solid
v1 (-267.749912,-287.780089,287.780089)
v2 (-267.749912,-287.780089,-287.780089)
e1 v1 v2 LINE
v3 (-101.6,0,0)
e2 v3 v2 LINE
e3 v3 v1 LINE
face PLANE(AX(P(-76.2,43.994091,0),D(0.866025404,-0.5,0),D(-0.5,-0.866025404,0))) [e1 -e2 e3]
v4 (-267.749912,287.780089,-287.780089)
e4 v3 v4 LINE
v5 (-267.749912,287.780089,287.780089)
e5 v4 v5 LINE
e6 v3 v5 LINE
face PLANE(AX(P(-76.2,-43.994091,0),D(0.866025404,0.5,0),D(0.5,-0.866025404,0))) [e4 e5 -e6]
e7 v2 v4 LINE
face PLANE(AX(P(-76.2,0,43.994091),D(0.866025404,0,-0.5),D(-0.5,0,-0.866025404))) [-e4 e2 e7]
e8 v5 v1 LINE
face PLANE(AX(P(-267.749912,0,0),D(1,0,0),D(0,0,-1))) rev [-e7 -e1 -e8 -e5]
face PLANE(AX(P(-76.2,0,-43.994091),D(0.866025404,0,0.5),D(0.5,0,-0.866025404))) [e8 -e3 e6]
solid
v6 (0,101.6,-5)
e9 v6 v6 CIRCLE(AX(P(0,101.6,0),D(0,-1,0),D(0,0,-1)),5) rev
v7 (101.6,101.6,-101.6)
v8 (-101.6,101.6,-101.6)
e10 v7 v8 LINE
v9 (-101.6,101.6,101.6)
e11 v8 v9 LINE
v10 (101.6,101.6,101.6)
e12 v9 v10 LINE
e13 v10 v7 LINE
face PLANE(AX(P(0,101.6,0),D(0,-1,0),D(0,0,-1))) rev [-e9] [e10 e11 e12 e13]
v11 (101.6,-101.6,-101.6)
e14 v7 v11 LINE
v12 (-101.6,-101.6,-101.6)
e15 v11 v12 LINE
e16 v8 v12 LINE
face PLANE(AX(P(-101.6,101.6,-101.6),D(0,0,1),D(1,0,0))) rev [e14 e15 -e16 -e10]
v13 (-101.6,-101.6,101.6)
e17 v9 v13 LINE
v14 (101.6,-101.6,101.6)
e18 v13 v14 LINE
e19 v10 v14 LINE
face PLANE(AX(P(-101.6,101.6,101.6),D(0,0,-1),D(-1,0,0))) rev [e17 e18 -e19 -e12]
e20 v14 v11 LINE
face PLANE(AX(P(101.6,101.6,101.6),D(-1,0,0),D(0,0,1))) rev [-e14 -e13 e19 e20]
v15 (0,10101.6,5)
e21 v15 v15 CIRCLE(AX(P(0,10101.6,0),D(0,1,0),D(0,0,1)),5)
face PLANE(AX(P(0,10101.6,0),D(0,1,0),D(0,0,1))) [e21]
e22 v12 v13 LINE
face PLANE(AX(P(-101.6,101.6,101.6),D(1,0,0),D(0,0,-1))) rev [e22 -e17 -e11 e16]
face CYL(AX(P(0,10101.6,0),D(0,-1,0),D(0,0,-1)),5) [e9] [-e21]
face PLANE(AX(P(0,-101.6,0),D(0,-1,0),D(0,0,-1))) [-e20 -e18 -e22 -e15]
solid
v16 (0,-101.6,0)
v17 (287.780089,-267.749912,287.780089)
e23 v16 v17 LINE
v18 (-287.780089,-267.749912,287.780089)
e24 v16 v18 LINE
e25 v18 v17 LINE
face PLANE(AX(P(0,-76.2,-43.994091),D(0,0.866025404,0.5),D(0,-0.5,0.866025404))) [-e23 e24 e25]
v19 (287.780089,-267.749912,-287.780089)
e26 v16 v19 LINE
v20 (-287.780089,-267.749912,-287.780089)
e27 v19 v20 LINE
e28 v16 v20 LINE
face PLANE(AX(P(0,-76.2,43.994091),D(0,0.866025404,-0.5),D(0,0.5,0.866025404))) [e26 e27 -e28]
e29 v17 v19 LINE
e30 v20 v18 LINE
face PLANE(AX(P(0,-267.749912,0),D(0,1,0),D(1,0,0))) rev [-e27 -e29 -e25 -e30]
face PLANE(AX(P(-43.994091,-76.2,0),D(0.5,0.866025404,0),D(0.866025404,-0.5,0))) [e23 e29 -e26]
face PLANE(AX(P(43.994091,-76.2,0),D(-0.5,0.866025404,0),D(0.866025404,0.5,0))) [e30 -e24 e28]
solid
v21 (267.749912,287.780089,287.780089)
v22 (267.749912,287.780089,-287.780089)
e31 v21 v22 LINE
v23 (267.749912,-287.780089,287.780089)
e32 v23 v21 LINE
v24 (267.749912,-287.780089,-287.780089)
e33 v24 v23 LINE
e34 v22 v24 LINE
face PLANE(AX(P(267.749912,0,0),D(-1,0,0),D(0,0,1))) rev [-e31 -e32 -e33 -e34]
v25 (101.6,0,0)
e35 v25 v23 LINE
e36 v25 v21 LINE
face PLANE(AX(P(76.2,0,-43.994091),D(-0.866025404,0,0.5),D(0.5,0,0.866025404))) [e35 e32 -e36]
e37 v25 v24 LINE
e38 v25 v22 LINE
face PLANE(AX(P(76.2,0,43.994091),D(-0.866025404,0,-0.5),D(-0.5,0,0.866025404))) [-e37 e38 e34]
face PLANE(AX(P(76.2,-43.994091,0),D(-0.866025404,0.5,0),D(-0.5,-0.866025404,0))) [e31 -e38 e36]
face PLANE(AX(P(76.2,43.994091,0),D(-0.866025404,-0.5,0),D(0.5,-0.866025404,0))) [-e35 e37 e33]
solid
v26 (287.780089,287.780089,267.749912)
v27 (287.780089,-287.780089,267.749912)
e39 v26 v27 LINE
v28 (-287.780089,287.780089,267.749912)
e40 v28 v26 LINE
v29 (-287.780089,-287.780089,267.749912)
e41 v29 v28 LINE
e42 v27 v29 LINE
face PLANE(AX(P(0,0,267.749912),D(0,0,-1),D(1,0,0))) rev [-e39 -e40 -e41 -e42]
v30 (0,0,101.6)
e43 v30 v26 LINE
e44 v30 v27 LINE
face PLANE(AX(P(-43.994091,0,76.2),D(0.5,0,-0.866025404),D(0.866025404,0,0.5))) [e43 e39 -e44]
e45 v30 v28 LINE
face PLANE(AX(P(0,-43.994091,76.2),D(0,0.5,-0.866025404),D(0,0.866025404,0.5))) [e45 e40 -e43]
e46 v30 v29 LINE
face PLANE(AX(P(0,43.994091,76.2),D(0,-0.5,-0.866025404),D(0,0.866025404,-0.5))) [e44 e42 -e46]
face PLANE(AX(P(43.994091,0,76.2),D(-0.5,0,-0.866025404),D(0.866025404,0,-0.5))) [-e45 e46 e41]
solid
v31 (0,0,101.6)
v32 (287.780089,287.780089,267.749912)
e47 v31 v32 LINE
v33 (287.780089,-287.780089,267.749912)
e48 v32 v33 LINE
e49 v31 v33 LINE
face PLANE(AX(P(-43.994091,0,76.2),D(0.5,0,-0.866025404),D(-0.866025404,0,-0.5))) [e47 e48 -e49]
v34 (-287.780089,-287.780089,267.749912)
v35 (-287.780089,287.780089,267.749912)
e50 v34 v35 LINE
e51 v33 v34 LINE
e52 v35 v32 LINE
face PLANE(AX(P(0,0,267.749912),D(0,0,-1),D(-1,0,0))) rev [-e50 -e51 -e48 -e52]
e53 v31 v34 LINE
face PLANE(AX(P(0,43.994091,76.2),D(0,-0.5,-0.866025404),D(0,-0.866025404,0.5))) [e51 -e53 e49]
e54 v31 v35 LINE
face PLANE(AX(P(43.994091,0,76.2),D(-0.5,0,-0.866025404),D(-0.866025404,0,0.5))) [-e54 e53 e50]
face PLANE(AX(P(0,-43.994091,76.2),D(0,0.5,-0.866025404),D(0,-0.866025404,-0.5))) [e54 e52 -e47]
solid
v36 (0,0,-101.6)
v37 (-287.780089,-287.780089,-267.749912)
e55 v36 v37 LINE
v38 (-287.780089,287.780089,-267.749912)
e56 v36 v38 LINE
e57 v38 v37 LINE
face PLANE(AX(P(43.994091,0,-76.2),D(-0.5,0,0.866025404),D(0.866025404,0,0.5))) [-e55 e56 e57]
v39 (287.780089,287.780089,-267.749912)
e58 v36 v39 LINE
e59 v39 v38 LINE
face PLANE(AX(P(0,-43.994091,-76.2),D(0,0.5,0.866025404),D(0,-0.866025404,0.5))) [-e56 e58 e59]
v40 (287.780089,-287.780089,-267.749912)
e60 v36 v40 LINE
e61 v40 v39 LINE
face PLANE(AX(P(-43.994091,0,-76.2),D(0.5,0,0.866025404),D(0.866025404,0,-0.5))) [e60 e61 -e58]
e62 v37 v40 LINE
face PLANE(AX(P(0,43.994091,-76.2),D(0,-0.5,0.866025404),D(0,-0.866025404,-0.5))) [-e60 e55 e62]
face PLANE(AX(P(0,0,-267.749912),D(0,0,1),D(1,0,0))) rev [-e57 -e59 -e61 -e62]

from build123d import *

# Parameters (mm, degrees)
SKETCH1_W           = 203.2
SKETCH1_H           = 203.2
BOSS_EXTRUDE1_DEPTH = 101.6
LOFT1_OUTLINE_W     = 575.560177182
LOFT1_OUTLINE_H     = 575.560177182
LOFT1_DEPTH         = 166.149911615
LOFT1_TAPER         = 60
CIRPATTERN1_COUNT   = 3
CIRPATTERN1_ANGLE   = 180
CIRPATTERN2_COUNT   = 4
SKETCH7_R           = 5
BOSS_EXTRUDE2_DEPTH = 10000


# Read off the part's stored shape, not the designer's step: Loft1
with BuildPart() as part:
    # Sketch1 → Boss-Extrude1 (new, symmetric)
    with BuildSketch(Plane(origin=(0, 0, 0), x_dir=(1, 0, 0), z_dir=(0, 1, 0))):
        Rectangle(SKETCH1_W, SKETCH1_H)
    extrude(amount=BOSS_EXTRUDE1_DEPTH, both=True)

    # Sketch7 → Boss-Extrude2 (add)
    with BuildSketch(Plane(origin=(0, 101.6, 0), x_dir=(1, 0, 0), z_dir=(0, 1, 0))):
        with Locations(Location((0, 0, 0), (0, 0, 90))):
            Circle(SKETCH7_R)
    extrude(amount=BOSS_EXTRUDE2_DEPTH)


with BuildPart() as body_2:
    # Loft1 outline → Loft1 (new body)
    with BuildSketch(Plane.XY.offset(-267.749911615)):
        Rectangle(LOFT1_OUTLINE_W, LOFT1_OUTLINE_H)
    extrude(amount=LOFT1_DEPTH, taper=LOFT1_TAPER)


with BuildPart() as cirpattern1_1:
    # CirPattern1: pattern copy
    add(body_2.part.rotate(Axis((0, 0, 0), (-1, 0, 0)), 1 * CIRPATTERN1_ANGLE / (CIRPATTERN1_COUNT - 1)))


with BuildPart() as cirpattern1_2:
    # CirPattern1: pattern copy
    add(body_2.part.rotate(Axis((0, 0, 0), (-1, 0, 0)), 2 * CIRPATTERN1_ANGLE / (CIRPATTERN1_COUNT - 1)))


with BuildPart() as cirpattern2_1:
    # CirPattern2: pattern copy
    add(body_2.part.rotate(Axis((0, 0, 0), (0, 1, 0)), 1 * 360 / CIRPATTERN2_COUNT))


with BuildPart() as cirpattern2_2:
    # CirPattern2: pattern copy
    add(body_2.part.rotate(Axis((0, 0, 0), (0, 1, 0)), 2 * 360 / CIRPATTERN2_COUNT))


with BuildPart() as cirpattern2_3:
    # CirPattern2: pattern copy
    add(body_2.part.rotate(Axis((0, 0, 0), (0, 1, 0)), 3 * 360 / CIRPATTERN2_COUNT))


solid = Compound([part.part, body_2.part, cirpattern1_1.part, cirpattern1_2.part, cirpattern2_1.part, cirpattern2_2.part, cirpattern2_3.part])
